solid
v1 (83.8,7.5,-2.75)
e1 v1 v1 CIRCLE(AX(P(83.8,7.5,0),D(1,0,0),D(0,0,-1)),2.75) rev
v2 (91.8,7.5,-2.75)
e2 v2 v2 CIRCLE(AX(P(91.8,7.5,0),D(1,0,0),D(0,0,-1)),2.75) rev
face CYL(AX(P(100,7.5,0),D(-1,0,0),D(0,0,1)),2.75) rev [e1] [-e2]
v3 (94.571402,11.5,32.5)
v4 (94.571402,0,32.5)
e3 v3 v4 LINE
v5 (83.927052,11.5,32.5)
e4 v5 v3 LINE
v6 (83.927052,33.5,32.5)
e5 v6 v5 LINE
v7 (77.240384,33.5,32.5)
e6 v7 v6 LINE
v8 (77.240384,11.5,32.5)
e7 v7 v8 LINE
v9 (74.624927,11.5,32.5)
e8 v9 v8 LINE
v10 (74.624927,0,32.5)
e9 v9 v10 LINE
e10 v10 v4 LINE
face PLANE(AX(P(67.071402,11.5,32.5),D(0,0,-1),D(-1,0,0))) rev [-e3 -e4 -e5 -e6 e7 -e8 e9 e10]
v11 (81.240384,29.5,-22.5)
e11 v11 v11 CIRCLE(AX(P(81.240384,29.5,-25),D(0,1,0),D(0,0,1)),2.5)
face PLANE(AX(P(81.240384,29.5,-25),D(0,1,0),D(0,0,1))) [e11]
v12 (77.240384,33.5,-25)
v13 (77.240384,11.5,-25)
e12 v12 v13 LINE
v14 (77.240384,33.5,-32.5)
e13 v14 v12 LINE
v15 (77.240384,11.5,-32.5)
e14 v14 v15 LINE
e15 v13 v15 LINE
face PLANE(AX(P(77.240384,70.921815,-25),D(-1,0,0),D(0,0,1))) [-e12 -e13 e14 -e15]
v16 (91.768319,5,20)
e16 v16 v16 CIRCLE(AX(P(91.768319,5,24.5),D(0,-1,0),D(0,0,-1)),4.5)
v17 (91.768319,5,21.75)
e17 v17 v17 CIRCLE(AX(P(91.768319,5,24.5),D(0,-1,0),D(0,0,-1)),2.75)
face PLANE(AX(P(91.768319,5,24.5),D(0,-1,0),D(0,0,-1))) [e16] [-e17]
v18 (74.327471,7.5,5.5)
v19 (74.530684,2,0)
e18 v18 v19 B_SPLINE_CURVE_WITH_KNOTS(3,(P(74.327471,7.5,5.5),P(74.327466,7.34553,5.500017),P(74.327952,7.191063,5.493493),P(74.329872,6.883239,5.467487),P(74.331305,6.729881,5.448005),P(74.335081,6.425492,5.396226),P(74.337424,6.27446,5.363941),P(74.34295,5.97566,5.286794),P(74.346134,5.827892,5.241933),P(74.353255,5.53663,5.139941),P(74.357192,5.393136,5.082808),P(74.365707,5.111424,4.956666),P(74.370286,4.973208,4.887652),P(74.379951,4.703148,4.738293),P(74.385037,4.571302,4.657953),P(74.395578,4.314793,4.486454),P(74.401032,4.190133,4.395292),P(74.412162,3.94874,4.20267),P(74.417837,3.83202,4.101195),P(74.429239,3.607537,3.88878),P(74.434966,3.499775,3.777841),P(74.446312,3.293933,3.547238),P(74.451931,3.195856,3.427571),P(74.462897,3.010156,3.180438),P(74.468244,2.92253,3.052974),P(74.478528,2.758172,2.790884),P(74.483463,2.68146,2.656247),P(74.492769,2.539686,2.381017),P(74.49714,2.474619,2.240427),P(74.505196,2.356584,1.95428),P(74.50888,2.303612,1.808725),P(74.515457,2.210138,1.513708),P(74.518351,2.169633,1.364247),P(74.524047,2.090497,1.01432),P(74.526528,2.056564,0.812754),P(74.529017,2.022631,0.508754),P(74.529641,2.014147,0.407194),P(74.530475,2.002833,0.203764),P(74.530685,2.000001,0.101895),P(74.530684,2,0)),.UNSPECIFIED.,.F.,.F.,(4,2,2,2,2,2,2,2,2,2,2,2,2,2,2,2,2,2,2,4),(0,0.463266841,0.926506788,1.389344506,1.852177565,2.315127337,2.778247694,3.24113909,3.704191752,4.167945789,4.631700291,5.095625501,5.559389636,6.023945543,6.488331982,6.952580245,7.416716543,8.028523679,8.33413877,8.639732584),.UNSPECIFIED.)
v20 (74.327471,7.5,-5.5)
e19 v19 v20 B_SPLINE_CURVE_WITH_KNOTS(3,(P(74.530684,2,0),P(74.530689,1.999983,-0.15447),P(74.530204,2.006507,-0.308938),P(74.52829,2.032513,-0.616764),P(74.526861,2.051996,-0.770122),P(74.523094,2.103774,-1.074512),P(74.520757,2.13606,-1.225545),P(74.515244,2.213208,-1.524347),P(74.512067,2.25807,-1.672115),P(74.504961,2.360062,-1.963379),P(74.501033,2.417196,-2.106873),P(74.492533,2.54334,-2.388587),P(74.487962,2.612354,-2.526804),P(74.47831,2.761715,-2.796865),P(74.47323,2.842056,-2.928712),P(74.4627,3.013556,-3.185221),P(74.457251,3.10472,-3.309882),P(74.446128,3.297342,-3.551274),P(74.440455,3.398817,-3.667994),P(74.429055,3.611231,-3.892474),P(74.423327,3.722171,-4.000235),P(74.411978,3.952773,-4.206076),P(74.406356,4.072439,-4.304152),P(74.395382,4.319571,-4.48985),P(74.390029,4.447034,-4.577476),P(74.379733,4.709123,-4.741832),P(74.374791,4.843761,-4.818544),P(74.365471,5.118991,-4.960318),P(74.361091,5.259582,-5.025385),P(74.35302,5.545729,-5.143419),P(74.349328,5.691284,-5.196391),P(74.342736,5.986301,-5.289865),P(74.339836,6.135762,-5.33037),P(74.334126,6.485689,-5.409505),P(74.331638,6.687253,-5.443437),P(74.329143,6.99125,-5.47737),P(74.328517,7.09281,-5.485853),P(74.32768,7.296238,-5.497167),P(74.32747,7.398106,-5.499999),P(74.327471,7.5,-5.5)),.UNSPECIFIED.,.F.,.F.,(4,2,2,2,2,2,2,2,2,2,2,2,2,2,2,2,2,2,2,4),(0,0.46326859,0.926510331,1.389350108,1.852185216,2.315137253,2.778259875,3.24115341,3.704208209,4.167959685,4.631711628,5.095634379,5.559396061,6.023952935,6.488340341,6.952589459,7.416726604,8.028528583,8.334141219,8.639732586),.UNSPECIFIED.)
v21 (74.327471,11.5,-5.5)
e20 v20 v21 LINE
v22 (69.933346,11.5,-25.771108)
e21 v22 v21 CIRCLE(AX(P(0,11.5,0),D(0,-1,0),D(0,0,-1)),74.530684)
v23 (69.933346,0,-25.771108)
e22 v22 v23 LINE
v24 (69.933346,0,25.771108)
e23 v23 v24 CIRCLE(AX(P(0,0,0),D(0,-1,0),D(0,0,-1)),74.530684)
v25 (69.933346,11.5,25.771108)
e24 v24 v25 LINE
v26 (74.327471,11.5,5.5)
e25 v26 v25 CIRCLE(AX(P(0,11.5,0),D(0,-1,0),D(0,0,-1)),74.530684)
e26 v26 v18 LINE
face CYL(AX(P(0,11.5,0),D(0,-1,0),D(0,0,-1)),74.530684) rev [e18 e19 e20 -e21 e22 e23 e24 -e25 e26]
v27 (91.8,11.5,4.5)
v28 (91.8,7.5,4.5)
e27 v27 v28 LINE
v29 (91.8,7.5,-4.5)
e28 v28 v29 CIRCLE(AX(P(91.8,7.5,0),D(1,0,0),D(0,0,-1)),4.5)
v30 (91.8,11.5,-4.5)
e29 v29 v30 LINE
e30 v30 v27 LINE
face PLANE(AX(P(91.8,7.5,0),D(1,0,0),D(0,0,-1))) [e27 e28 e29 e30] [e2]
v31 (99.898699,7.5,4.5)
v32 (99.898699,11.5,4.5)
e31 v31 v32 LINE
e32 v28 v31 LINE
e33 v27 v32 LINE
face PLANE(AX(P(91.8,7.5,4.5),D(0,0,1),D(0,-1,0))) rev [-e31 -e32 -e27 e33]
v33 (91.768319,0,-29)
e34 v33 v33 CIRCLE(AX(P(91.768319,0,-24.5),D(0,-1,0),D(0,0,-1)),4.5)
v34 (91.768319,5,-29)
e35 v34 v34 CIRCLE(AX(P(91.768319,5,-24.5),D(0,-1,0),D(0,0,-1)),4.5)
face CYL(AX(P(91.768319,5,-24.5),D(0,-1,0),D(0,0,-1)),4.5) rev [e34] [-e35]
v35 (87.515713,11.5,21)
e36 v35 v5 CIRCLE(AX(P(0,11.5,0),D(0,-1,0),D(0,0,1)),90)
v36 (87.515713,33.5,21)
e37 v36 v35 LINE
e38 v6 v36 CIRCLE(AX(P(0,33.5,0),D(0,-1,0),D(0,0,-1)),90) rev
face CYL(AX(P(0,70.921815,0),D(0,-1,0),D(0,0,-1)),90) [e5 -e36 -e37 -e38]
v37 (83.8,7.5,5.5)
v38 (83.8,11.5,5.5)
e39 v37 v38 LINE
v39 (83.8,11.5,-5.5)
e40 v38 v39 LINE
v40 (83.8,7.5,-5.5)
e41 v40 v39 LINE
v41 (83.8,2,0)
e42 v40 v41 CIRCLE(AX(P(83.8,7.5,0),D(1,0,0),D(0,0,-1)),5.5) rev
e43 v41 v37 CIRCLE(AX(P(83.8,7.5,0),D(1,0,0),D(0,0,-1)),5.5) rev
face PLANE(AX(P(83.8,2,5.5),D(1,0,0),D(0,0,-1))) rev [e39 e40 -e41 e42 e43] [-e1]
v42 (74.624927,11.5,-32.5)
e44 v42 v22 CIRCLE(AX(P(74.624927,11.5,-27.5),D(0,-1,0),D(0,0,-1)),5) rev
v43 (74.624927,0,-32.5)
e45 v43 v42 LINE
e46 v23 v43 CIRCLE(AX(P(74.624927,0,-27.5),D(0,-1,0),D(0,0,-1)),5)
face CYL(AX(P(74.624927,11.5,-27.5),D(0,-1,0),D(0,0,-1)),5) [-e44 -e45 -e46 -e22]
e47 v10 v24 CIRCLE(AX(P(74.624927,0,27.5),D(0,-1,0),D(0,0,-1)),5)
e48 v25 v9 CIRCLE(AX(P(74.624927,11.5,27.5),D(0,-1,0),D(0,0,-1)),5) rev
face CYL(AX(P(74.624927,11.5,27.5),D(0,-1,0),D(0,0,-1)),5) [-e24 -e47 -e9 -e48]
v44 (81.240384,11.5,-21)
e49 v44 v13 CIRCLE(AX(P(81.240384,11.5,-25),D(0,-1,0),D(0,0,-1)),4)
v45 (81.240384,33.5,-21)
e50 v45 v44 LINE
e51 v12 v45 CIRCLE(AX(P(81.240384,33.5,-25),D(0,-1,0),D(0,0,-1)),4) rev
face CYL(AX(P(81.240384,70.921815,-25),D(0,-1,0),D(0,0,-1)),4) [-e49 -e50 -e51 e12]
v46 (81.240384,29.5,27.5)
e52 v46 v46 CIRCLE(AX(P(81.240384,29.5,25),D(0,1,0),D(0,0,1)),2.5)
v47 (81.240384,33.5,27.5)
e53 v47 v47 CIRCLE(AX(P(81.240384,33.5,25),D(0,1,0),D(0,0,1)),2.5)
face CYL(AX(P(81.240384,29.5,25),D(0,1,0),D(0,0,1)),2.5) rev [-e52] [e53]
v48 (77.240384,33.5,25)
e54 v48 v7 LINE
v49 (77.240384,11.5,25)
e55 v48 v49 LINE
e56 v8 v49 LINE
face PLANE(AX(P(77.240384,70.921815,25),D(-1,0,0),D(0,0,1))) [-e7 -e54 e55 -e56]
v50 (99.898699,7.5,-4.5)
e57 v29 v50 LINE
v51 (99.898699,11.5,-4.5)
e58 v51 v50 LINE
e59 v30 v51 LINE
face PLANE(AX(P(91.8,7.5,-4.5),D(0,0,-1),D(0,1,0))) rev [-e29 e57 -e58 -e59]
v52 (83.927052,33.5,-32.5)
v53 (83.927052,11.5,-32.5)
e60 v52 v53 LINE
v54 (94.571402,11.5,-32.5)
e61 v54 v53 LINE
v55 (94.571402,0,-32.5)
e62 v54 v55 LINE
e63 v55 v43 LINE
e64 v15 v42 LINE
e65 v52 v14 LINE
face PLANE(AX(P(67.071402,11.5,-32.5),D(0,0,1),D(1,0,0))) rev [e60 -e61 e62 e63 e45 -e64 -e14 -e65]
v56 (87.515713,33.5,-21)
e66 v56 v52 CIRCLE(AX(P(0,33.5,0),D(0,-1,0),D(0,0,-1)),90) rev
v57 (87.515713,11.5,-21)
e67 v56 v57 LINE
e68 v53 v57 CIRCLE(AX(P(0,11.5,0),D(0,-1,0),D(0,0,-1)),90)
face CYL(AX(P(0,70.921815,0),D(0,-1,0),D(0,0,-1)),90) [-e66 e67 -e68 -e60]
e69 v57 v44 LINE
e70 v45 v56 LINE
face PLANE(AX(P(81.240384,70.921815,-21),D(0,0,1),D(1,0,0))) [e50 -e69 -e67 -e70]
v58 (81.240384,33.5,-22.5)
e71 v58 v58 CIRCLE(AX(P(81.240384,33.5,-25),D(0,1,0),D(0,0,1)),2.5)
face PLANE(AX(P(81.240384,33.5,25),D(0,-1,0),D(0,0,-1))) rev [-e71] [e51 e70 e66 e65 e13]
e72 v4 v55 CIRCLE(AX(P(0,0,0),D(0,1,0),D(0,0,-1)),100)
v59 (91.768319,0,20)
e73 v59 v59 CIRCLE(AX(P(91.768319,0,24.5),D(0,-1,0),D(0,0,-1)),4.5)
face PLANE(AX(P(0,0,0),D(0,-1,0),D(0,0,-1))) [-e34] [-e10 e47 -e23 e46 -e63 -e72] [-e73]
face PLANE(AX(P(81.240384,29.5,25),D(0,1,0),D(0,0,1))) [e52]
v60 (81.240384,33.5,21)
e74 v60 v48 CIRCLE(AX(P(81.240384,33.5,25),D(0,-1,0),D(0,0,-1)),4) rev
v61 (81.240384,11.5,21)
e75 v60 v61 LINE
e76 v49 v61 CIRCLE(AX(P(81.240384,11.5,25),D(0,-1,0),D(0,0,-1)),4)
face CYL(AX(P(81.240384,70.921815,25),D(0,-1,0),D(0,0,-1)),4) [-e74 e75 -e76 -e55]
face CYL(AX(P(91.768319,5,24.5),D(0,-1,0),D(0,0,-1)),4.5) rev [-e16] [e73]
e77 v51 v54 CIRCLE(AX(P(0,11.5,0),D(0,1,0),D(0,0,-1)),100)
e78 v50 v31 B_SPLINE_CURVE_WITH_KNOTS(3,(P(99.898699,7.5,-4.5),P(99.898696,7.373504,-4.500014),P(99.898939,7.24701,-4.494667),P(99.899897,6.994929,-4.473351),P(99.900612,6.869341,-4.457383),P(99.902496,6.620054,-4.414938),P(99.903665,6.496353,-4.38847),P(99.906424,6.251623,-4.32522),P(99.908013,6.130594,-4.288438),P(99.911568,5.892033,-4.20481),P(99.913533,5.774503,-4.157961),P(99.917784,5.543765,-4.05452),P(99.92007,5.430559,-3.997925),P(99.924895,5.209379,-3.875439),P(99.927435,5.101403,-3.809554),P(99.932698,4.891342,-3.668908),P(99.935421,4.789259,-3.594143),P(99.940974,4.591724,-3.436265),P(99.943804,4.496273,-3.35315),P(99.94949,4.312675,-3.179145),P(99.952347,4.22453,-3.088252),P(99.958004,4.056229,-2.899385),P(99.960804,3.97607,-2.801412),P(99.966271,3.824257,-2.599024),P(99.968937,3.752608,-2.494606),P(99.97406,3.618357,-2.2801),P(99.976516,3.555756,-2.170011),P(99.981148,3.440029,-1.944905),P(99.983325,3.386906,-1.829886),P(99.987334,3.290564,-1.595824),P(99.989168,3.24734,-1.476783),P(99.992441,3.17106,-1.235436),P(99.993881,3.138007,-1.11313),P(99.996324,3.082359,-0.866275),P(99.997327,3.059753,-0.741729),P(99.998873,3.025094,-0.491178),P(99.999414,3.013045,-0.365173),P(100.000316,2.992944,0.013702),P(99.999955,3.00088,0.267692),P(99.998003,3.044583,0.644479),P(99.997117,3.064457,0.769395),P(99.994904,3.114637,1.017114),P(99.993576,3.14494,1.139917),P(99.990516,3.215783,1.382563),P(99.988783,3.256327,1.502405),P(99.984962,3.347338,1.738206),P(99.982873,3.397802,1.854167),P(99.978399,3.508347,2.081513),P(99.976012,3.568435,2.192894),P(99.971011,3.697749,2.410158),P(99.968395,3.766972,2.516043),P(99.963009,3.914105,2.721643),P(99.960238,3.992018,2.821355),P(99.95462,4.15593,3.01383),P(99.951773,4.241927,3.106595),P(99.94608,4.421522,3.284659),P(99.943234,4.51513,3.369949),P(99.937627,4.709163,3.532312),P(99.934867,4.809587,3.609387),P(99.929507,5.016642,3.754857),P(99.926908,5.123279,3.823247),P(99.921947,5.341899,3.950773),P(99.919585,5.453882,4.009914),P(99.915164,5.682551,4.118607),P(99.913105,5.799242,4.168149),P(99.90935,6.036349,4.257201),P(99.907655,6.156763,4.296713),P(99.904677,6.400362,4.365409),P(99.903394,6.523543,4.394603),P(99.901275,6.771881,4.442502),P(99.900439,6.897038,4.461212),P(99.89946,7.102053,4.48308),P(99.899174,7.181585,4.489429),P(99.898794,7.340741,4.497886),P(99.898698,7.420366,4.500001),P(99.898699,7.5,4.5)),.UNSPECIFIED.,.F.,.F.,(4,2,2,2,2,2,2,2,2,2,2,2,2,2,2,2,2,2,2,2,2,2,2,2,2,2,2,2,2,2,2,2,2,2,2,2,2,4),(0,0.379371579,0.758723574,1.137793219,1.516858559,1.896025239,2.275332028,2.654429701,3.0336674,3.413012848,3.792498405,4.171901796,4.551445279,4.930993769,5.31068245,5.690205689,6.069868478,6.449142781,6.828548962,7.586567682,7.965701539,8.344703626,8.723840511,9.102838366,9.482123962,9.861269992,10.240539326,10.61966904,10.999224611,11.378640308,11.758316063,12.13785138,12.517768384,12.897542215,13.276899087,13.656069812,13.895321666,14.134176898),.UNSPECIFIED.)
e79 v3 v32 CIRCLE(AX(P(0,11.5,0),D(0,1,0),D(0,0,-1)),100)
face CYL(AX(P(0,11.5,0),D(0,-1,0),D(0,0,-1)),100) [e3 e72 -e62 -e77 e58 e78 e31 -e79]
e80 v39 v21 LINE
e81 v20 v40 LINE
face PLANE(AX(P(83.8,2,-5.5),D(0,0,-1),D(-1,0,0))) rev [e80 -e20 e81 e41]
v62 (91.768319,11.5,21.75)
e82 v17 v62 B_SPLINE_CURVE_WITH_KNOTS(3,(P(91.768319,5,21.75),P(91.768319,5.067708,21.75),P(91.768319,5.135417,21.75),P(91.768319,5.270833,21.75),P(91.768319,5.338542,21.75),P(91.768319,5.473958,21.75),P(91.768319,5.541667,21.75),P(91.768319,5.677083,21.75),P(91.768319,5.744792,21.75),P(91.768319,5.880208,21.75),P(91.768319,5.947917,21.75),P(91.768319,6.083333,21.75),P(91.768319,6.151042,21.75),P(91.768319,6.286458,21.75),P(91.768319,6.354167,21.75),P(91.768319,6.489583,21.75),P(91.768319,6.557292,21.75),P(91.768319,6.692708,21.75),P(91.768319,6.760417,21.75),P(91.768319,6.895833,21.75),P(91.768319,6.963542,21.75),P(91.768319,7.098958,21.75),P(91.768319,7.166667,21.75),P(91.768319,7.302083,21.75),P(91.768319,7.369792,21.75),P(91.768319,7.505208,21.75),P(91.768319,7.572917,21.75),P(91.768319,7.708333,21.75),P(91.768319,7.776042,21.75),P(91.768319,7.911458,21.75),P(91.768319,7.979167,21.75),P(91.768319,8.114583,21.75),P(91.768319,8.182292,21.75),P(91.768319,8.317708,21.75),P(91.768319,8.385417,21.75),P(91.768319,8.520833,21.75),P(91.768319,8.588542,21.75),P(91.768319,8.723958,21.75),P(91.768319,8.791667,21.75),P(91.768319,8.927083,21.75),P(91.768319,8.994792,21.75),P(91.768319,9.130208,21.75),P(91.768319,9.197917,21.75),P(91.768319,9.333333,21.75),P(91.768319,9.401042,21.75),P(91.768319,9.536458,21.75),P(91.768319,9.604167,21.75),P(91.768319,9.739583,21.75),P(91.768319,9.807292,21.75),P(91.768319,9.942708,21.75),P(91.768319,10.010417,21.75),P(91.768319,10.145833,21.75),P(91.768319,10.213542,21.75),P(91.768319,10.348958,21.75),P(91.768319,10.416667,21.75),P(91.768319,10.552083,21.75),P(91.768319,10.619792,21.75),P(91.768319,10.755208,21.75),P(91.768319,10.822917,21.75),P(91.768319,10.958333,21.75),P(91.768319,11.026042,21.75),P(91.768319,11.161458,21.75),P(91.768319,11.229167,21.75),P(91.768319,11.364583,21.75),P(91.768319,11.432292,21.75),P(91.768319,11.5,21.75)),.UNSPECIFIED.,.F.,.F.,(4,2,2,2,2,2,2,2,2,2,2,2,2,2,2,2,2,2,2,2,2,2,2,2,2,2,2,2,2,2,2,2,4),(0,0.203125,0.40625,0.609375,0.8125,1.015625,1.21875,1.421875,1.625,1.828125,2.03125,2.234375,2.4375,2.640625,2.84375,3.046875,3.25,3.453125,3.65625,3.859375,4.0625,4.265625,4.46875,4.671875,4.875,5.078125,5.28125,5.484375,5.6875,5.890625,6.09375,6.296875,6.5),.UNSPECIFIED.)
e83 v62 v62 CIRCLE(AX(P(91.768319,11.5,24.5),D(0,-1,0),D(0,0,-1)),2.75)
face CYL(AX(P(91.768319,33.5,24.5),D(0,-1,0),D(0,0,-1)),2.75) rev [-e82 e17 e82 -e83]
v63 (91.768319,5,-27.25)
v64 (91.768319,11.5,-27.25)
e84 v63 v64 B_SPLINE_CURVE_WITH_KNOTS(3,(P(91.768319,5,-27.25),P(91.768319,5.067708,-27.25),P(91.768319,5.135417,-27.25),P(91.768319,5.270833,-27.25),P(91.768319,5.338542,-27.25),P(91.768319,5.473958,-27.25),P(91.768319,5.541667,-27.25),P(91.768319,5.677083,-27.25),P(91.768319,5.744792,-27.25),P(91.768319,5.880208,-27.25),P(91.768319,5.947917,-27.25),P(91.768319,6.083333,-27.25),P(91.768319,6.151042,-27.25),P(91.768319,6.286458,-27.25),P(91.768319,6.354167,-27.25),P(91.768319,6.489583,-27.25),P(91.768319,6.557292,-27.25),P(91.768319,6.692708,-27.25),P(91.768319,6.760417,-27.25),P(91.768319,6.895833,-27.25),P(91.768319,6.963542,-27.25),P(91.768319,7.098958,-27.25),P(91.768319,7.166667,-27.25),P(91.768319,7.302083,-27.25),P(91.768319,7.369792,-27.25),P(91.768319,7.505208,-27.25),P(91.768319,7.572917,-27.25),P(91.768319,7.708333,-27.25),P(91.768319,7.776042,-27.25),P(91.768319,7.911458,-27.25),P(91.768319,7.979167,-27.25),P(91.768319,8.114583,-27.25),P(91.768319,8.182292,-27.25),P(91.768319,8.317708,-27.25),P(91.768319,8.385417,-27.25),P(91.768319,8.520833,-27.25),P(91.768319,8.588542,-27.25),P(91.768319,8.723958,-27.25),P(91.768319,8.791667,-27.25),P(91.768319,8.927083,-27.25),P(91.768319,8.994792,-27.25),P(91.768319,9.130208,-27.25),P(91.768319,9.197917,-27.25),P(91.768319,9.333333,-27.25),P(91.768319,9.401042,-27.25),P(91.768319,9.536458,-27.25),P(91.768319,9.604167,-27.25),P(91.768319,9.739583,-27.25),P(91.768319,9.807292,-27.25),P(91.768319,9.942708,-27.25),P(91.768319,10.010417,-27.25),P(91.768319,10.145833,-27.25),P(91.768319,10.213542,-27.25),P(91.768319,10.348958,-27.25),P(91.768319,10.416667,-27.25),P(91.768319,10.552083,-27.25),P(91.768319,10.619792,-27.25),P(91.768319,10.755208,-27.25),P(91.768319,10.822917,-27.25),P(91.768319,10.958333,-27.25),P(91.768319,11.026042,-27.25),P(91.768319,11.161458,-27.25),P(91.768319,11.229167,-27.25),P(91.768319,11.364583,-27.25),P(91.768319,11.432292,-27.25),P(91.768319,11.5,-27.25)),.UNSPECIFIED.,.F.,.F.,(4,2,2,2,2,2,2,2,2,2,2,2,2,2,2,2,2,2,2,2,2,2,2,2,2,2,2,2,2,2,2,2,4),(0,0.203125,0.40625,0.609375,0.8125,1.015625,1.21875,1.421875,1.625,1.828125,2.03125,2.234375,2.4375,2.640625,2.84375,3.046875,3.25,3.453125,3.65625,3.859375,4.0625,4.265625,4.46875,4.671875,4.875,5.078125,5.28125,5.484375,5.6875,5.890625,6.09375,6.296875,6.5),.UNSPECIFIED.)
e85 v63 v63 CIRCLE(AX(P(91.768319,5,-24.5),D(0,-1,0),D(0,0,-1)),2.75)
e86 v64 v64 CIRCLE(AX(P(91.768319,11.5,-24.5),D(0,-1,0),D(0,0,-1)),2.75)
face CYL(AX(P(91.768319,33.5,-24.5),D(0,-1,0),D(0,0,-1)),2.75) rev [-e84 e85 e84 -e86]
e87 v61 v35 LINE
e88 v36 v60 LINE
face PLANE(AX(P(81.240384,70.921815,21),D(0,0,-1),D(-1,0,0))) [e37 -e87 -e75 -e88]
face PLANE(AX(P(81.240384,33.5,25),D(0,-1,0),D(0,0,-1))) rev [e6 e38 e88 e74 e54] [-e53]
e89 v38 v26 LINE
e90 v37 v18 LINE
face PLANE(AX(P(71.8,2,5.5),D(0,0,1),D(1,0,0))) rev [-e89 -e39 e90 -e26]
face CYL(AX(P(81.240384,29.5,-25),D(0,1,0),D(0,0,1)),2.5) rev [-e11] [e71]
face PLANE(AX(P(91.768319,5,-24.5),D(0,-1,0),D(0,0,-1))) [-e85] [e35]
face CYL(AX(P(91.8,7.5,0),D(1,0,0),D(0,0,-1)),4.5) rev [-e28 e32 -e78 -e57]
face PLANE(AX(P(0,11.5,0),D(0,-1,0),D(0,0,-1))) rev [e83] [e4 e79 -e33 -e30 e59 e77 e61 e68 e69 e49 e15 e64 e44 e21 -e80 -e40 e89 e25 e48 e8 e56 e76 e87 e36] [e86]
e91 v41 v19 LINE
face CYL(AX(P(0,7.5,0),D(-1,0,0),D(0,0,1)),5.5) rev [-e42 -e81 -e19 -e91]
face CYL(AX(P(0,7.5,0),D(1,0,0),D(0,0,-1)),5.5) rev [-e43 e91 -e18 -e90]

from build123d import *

# Parameters (mm, degrees)
BOSS_EXTRUDE1_DEPTH = 11.5
BOSS_EXTRUDE2_DEPTH = 22
SKETCH3_R           = 2.5
CUT_EXTRUDE1_DEPTH  = 4
SKETCH4_R           = 4.5
CUT_EXTRUDE2_DEPTH  = 5
SKETCH5_R           = 2.75
CUT_EXTRUDE3_DEPTH  = 109.942645461
SKETCH6_R           = 2.75
CUT_EXTRUDE4_DEPTH  = 58.120859524
CUT_EXTRUDE5_DEPTH  = 8.2
SKETCH7_W           = 12
SKETCH7_H           = 11
CUT_EXTRUDE6_DEPTH  = 9.5
FILLET1_R           = 5.5
FILLET2_R           = 5


with BuildPart() as part:
    # Sketch1 → Boss-Extrude1 (new body)
    with BuildSketch(Plane(origin=(0, 0, 0), x_dir=(1, 0, 0), z_dir=(0, 1, 0))):
        with BuildLine():
            Line((67.071401597, -32.5), (94.571401597, -32.5))
            ThreePointArc((94.571401597, -32.5), (100, 0), (94.571401597, 32.5))
            Line((94.571401597, 32.5), (67.071401597, 32.5))
            ThreePointArc((67.071401597, 32.5), (74.530684367, 0), (67.071401597, -32.5))
        make_face()
    extrude(amount=BOSS_EXTRUDE1_DEPTH)

    # Sketch2 → Boss-Extrude2 (add)
    with BuildSketch(Plane.XZ.offset(-11.5)):
        with BuildLine():
            Line((81.240384046, 21), (87.515712875, 21))
            ThreePointArc((87.515712875, 21), (85.914014443, 26.810112315), (83.927051658, 32.5))
            Line((83.927051658, 32.5), (77.240384046, 32.5))
            Line((77.240384046, 32.5), (77.240384046, 25))
            ThreePointArc((77.240384046, 25), (78.411956922, 22.171572875), (81.240384046, 21))
        make_face()
        with BuildLine():
            Line((77.240384046, -25), (77.240384046, -32.5))
            Line((77.240384046, -32.5), (83.927051658, -32.5))
            ThreePointArc((83.927051658, -32.5), (85.914014443, -26.810112315), (87.515712875, -21))
            Line((87.515712875, -21), (81.240384046, -21))
            ThreePointArc((81.240384046, -21), (78.411956922, -22.171572875), (77.240384046, -25))
        make_face()
    extrude(amount=-BOSS_EXTRUDE2_DEPTH)

    # Sketch3 → Cut-Extrude1 (cut)
    with BuildSketch(Plane(origin=(0, 33.5, 0), x_dir=(1, 0, 0), z_dir=(0, 1, 0))):
        with Locations(Location((81.240384046, 25, 0), (0, 0, 270))):
            Circle(SKETCH3_R)
        with Locations(Location((81.240384046, -25, 0), (0, 0, 270))):
            Circle(SKETCH3_R)
    extrude(amount=-CUT_EXTRUDE1_DEPTH, mode=Mode.SUBTRACT)

    # Sketch4 → Cut-Extrude2 (cut)
    with BuildSketch(Plane.XZ):
        with Locations(Location((91.768319444, 24.5, 0), (0, 0, 270))):
            Circle(SKETCH4_R)
        with Locations(Location((91.768319444, -24.5, 0), (0, 0, 270))):
            Circle(SKETCH4_R)
    extrude(amount=-CUT_EXTRUDE2_DEPTH, mode=Mode.SUBTRACT)

    # Sketch5 → Cut-Extrude3 (cut, through all)
    with BuildSketch(Plane.XZ.offset(-5)):
        with Locations(Location((91.768319444, 24.5, 0), (0, 0, 270))):
            Circle(SKETCH5_R)
        with Locations(Location((91.768319444, -24.5, 0), (0, 0, 270))):
            Circle(SKETCH5_R)
    extrude(amount=-CUT_EXTRUDE3_DEPTH, mode=Mode.SUBTRACT)

    # Sketch6 → Cut-Extrude4 (cut, through all)
    with BuildSketch(Plane.ZY.offset(-67.071401597)):
        with Locations((0, 7.5)):
            Circle(SKETCH6_R)
    extrude(amount=-CUT_EXTRUDE4_DEPTH, mode=Mode.SUBTRACT)

    # Sketch8 → Cut-Extrude5 (cut)
    with BuildSketch(Plane(origin=(100, 0, 0), x_dir=(0, 0, -1), z_dir=(1, 0, 0))):
        with BuildLine():
            Line((-4.5, 7.5), (-4.5, 11.5))
            Line((-4.5, 11.5), (4.5, 11.5))
            Line((4.5, 11.5), (4.5, 7.5))
            ThreePointArc((4.5, 7.5), (0, 3), (-4.5, 7.5))
        make_face()
    extrude(amount=-CUT_EXTRUDE5_DEPTH, mode=Mode.SUBTRACT)

    # Sketch7 → Cut-Extrude6 (cut)
    with BuildSketch(Plane(origin=(0, 11.5, 0), x_dir=(1, 0, 0), z_dir=(0, 1, 0))):
        with Locations((77.8, 0)):
            Rectangle(SKETCH7_W, SKETCH7_H)
    extrude(amount=-CUT_EXTRUDE6_DEPTH, mode=Mode.SUBTRACT)

    # Fillet1
    # the kernel refuses this fillet: 5.5 mm, written as the material it adds along each edge
    with BuildSketch(Plane(origin=(60.577470777, 2, 5.5), x_dir=(0, 1, 0), z_dir=(1, 0, 0))) as fillet1_piece_1_section:
        with BuildLine():
            CenterArc((FILLET1_R, -FILLET1_R), FILLET1_R, 90, 90)
            Line((0, -FILLET1_R), (0, 0))
            Line((0, 0), (FILLET1_R, 0))
        make_face()
    fillet1_piece_1 = extrude(amount=36.972529223, mode=Mode.PRIVATE)
    fillet1_piece_1 = fillet1_piece_1 - Plane(origin=(0, 3.249781121, 0), x_dir=(0.899916620473715, 0, -0.43606200957566527), z_dir=(0, -1, 0)) * Cylinder(74.530684367, 96, mode=Mode.PRIVATE)
    add(fillet1_piece_1)
    with BuildSketch(Plane(origin=(97.55, 2, -5.5), x_dir=(0, 0, 1), z_dir=(-1, 0, 0))) as fillet1_piece_2_section:
        with BuildLine():
            CenterArc((FILLET1_R, FILLET1_R), FILLET1_R, 180, 90)
            Line((0, FILLET1_R), (0, 0))
            Line((0, 0), (FILLET1_R, 0))
        make_face()
    fillet1_piece_2 = extrude(amount=36.972529223, mode=Mode.PRIVATE)
    fillet1_piece_2 = fillet1_piece_2 - Plane(origin=(0, 3.245173128, 0), x_dir=(0.899916620473715, 0, -0.43606200957566527), z_dir=(0, -1, 0)) * Cylinder(74.530684367, 96, mode=Mode.PRIVATE)
    add(fillet1_piece_2)

    # Fillet2
    fillet2_edges = [part.edges().sort_by_distance(p)[0] for p in [
        (67.071401597, 5.75, 32.5),
        (67.071401597, 5.75, -32.5),
    ]]
    fillet(fillet2_edges, radius=FILLET2_R)


solid = part.part
